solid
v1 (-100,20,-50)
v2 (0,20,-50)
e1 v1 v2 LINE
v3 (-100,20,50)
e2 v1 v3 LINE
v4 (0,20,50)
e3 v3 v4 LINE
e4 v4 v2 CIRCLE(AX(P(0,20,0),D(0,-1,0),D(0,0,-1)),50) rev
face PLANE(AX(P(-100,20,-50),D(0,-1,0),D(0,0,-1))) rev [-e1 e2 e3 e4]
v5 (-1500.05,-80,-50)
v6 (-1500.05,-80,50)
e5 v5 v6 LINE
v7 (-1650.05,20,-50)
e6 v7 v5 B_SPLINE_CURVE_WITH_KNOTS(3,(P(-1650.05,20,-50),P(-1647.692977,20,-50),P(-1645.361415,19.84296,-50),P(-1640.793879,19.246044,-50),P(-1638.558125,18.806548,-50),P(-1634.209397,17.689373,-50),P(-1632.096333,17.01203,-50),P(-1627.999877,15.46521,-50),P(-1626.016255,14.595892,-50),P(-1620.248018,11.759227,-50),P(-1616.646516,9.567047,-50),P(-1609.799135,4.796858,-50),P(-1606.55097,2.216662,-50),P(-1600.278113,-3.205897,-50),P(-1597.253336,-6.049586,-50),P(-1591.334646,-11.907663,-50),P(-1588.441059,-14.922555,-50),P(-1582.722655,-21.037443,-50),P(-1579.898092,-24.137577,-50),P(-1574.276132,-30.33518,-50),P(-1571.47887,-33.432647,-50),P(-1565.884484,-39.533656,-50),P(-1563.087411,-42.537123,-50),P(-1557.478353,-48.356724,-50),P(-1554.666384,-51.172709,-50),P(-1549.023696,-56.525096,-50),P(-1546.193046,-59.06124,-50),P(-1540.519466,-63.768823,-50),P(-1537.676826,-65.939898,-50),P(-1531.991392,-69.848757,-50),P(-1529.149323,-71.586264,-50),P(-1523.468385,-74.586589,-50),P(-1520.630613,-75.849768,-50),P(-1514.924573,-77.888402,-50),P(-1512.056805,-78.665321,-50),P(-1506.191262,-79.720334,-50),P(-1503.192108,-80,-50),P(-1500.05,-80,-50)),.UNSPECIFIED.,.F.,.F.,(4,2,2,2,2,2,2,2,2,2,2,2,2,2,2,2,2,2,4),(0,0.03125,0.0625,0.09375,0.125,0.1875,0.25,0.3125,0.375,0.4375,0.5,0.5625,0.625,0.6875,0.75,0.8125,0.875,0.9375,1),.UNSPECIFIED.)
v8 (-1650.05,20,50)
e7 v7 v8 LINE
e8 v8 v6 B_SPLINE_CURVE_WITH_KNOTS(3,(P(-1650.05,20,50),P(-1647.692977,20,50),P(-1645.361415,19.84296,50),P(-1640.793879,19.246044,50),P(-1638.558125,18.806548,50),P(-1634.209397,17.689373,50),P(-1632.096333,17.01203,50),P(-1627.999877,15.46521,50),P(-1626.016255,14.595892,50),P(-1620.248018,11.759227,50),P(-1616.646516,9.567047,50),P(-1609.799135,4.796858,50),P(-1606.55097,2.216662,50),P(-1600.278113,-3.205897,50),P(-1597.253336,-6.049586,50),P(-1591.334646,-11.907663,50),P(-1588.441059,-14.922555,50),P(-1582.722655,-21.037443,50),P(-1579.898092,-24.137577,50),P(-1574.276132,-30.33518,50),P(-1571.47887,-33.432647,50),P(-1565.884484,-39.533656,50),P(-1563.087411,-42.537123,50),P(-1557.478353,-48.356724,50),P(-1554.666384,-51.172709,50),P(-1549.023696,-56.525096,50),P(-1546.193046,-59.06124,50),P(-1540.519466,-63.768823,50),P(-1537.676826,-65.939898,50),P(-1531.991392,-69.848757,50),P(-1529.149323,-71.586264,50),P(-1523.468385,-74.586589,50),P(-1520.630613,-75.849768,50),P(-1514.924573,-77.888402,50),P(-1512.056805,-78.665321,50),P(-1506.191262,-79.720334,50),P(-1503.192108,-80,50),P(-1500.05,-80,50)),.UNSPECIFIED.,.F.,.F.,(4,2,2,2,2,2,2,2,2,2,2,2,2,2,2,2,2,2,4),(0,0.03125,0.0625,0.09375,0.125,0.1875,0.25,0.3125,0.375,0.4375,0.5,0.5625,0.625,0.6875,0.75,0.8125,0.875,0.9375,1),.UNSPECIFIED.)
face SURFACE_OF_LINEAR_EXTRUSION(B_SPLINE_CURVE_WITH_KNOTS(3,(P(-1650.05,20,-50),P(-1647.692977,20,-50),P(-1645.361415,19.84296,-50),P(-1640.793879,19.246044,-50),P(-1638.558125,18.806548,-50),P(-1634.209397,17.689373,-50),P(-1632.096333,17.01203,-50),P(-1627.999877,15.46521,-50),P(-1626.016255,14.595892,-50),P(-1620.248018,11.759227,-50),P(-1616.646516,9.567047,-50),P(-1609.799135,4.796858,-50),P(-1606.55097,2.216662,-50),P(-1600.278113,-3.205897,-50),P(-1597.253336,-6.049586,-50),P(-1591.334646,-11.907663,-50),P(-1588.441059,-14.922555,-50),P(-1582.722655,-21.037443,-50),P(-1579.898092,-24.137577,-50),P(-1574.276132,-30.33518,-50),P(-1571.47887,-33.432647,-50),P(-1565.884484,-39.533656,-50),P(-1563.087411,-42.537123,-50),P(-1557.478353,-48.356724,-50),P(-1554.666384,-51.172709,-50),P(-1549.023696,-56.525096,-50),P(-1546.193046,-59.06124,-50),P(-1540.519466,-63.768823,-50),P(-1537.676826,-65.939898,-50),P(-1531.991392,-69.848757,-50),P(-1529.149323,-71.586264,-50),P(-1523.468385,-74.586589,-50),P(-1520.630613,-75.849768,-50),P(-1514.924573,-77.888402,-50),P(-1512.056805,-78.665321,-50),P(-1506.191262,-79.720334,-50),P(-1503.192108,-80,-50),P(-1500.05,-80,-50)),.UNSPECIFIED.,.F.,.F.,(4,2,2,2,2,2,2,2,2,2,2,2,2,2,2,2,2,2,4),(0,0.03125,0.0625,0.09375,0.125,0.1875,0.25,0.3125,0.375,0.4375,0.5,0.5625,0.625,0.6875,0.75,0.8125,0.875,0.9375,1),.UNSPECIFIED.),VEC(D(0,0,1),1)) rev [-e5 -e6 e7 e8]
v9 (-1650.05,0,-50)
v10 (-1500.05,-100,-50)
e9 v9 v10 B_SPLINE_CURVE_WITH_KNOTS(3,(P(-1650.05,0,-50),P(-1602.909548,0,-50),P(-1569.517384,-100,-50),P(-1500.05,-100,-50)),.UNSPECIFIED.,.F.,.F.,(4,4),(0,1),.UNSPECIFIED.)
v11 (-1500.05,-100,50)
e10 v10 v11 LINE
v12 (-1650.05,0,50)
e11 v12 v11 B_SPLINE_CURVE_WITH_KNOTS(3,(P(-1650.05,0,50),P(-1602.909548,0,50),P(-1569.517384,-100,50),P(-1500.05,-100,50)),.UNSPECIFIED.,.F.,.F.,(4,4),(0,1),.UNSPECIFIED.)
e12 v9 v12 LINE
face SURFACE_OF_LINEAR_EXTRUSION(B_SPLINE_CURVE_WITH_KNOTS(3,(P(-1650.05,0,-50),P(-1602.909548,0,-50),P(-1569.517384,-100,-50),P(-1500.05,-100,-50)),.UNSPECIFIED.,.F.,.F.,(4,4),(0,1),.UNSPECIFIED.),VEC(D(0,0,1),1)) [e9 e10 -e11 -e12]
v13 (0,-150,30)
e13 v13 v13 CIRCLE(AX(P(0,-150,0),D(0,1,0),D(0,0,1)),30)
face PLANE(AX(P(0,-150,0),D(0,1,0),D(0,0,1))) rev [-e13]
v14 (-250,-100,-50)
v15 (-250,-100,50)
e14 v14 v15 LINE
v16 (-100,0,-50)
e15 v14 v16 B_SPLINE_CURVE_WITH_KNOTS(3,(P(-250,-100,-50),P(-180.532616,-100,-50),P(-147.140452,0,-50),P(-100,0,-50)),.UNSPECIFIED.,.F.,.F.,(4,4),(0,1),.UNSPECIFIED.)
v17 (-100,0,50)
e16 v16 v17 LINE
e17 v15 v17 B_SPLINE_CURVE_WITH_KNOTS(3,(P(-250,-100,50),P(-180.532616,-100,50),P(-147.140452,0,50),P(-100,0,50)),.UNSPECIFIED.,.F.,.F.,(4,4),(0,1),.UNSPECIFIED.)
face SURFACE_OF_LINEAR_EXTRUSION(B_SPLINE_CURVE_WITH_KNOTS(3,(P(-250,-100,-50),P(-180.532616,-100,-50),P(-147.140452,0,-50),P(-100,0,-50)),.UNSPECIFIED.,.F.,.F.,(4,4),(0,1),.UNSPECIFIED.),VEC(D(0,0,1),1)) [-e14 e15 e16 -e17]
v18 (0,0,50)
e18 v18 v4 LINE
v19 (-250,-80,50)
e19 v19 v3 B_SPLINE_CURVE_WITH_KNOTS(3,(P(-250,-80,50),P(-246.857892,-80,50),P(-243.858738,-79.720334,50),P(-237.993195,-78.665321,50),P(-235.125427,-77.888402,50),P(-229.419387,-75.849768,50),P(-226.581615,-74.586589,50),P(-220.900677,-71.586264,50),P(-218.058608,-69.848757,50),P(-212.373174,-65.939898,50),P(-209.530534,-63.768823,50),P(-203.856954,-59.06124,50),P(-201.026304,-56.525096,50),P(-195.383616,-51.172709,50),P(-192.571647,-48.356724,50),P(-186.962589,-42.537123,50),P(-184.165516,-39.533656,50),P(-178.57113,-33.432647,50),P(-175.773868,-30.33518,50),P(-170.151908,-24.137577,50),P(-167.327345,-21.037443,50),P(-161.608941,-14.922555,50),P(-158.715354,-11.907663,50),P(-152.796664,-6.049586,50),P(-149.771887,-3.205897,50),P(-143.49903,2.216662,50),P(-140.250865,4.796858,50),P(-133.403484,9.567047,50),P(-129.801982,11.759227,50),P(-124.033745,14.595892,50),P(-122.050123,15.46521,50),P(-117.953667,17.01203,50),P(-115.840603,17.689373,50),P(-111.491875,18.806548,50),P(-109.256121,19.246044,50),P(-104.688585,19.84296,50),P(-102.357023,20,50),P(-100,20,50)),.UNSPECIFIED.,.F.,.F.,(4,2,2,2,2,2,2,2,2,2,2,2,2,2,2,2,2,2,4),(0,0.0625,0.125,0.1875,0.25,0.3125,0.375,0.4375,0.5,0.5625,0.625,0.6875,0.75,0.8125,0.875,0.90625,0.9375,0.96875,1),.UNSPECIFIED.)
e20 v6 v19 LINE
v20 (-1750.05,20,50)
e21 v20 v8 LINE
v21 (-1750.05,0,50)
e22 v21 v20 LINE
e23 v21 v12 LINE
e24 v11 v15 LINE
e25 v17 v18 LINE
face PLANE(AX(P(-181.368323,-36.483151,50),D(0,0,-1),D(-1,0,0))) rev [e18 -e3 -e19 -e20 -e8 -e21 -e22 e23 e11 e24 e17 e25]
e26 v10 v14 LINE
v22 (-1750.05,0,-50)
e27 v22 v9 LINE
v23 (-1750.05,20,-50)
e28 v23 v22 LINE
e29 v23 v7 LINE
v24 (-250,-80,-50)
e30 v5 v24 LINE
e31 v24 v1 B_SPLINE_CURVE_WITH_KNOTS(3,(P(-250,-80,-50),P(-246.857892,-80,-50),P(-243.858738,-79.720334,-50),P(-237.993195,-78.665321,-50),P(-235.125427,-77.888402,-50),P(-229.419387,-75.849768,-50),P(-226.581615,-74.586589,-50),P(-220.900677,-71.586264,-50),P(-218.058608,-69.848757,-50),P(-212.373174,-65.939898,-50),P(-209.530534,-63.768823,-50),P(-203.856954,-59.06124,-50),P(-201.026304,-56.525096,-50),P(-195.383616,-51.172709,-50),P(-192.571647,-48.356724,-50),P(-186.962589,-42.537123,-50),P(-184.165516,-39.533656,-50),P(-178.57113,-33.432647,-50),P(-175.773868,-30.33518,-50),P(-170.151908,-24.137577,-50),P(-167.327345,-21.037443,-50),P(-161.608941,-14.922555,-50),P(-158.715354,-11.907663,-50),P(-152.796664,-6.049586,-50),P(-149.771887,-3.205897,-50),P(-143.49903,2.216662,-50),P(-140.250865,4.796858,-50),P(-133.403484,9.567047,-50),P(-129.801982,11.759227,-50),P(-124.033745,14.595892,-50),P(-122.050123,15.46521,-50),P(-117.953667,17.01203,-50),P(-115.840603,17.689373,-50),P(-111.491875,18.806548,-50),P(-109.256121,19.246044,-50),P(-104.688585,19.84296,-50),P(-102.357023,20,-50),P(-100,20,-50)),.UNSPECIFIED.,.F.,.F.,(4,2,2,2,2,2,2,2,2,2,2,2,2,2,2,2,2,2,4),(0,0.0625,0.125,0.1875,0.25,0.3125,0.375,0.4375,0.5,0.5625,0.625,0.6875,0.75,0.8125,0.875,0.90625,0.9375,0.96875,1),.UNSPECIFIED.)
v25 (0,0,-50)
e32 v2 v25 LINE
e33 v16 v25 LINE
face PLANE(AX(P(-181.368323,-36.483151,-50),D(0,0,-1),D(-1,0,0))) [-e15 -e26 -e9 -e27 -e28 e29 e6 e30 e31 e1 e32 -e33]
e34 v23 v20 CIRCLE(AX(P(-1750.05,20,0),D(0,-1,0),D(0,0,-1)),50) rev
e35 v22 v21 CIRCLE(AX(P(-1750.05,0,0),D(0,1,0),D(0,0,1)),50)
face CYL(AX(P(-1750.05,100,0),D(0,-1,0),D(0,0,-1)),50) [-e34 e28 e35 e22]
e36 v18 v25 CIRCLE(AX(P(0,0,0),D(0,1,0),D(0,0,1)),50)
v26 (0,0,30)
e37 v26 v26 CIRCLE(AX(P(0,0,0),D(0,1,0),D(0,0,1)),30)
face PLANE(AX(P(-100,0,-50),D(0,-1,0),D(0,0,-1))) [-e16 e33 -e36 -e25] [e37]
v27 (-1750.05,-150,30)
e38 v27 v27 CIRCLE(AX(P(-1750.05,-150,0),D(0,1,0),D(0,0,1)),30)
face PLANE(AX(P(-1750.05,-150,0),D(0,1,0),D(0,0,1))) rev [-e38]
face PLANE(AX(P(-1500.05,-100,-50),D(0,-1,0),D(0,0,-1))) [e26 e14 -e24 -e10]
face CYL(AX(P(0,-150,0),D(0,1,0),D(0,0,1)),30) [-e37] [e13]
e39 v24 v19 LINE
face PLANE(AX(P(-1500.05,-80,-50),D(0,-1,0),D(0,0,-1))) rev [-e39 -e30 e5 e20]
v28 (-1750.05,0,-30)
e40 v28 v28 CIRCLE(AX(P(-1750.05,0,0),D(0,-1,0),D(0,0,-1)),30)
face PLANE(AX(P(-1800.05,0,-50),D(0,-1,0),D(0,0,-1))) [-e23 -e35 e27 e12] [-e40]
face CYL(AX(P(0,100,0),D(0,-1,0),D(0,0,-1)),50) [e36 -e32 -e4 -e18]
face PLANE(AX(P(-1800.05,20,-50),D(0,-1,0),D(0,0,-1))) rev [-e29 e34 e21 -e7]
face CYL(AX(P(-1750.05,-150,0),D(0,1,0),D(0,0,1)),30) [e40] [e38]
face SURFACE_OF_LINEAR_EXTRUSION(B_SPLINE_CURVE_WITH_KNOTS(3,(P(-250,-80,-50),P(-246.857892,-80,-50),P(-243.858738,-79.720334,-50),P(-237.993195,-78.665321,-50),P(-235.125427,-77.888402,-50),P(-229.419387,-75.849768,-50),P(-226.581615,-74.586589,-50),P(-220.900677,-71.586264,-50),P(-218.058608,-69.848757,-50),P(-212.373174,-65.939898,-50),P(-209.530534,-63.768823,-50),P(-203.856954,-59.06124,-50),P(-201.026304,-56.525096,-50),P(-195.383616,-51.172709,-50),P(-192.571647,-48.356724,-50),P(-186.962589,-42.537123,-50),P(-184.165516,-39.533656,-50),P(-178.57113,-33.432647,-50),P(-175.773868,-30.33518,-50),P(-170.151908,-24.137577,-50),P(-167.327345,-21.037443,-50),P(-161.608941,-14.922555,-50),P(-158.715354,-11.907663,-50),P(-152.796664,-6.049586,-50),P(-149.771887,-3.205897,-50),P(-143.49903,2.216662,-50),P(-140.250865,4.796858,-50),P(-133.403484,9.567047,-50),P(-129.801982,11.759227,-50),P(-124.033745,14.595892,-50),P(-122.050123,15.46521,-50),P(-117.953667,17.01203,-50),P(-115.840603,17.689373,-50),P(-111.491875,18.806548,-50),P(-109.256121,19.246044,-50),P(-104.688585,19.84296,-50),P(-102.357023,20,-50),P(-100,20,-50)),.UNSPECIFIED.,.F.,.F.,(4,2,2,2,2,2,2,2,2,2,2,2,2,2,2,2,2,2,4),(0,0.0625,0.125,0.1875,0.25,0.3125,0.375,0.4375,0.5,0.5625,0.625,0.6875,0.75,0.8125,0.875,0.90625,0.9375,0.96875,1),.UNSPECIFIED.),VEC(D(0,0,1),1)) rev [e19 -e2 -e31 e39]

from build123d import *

# Parameters (mm, degrees)
SKETCH1_R             = 30
BOSS_EXTRUDE1_DEPTH   = 150
BOSS_EXTRUDE1_2_DEPTH = 150
EXTRUDE_THIN1_START   = -100
EXTRUDE_THIN1_DEPTH   = 100
SKETCH2_OUTSIDE_W     = 2224.156
SKETCH2_OUTSIDE_H     = 474.106
CUT_EXTRUDE1_DEPTH    = 100


# Read off the part's stored shape, not the designer's step: Extrude-Thin1
with BuildPart() as part:
    # Sketch1 → Boss-Extrude1 (new body)
    with BuildSketch(Plane(origin=(0, 0, 0), x_dir=(1, 0, 0), z_dir=(0, 1, 0))):
        with Locations(Location((0, 0, 0), (0, 0, 270))):
            Circle(SKETCH1_R)
    extrude(amount=-BOSS_EXTRUDE1_DEPTH)



with BuildPart() as body_2:
    # Sketch1 → Boss-Extrude1 2 (new body)
    with BuildSketch(Plane(origin=(0, 0, 0), x_dir=(1, 0, 0), z_dir=(0, 1, 0))):
        with Locations(Location((-1750.05, 0, 0), (0, 0, 270))):
            Circle(SKETCH1_R)
    extrude(amount=-BOSS_EXTRUDE1_2_DEPTH)


with BuildPart() as part_1:
    add(part.part)

    add(body_2.part)  # Extrude-Thin1 merges body 2
    # Extrude-Thin1 outline → Extrude-Thin1 (add)
    with BuildSketch(Plane.XY.offset(50).offset(EXTRUDE_THIN1_START)):
        with BuildLine():
            Line((-1500.05, -100), (-250, -100))
            add(Edge.make_bspline(
                [(-250, -100), (-180.532615563, -100), (-147.140452079, 0), (-100, 0)],
                knots=[0, 0, 0, 0, 1, 1, 1, 1], degree=3))
            Line((-100, 0), (50, 0))
            Line((50, 0), (50, 20))
            Line((50, 20), (-100, 20))
            add(Edge.make_bspline(
                [(-250, -80), (-246.8578922, -80), (-243.858737849, -79.72033393), (-237.993194947, -78.665321149), (-235.125426927, -77.888401959), (-229.419387385, -75.849767547), (-226.581615187, -74.586589055), (-220.900676803, -71.586264248), (-218.058608228, -69.848756808), (-212.373173985, -65.939898134), (-209.530533574, -63.76882272), (-203.856954109, -59.061240354), (-201.026304365, -56.525095932), (-195.383615818, -51.172709385), (-192.571647436, -48.356724406), (-186.962589328, -42.537122759), (-184.165515953, -39.533655599), (-178.571130319, -33.432647215), (-175.773867523, -30.335180457), (-170.151907521, -24.137576717), (-167.327345009, -21.037442901), (-161.608940626, -14.922554595), (-158.715354463, -11.907662629), (-152.79666366, -6.049585507), (-149.771886809, -3.205896979), (-143.499030151, 2.216662309), (-140.250865349, 4.796857765), (-133.403484489, 9.567046655), (-129.801981816, 11.759226892), (-124.033745357, 14.595891945), (-122.050123128, 15.465210164), (-117.953666514, 17.012030347), (-115.8406028, 17.689372637), (-111.491874555, 18.806547682), (-109.256121065, 19.246044187), (-104.688584729, 19.842959809), (-102.357022604, 20), (-100, 20)],
                knots=[0, 0, 0, 0, 0.0625, 0.0625, 0.125, 0.125, 0.1875, 0.1875, 0.25, 0.25, 0.3125, 0.3125, 0.375, 0.375, 0.4375, 0.4375, 0.5, 0.5, 0.5625, 0.5625, 0.625, 0.625, 0.6875, 0.6875, 0.75, 0.75, 0.8125, 0.8125, 0.875, 0.875, 0.90625, 0.90625, 0.9375, 0.9375, 0.96875, 0.96875, 1, 1, 1, 1], degree=3))
            Line((-250, -80), (-1500.05, -80))
            add(Edge.make_bspline(
                [(-1650.05, 20), (-1647.692977396, 20), (-1645.361415271, 19.842959809), (-1640.793878935, 19.246044187), (-1638.558125445, 18.806547682), (-1634.2093972, 17.689372637), (-1632.096333486, 17.012030347), (-1627.999876872, 15.465210164), (-1626.016254643, 14.595891945), (-1620.248018184, 11.759226892), (-1616.646515511, 9.567046655), (-1609.799134651, 4.796857765), (-1606.550969849, 2.216662309), (-1600.278113191, -3.205896979), (-1597.25333634, -6.049585507), (-1591.334645537, -11.907662629), (-1588.441059374, -14.922554595), (-1582.722654991, -21.037442901), (-1579.898092479, -24.137576717), (-1574.276132477, -30.335180457), (-1571.478869681, -33.432647215), (-1565.884484047, -39.533655599), (-1563.087410672, -42.537122759), (-1557.478352564, -48.356724406), (-1554.666384182, -51.172709385), (-1549.023695635, -56.525095932), (-1546.193045891, -59.061240354), (-1540.519466426, -63.76882272), (-1537.676826015, -65.939898134), (-1531.991391772, -69.848756808), (-1529.149323197, -71.586264248), (-1523.468384813, -74.586589055), (-1520.630612615, -75.849767547), (-1514.924573073, -77.888401959), (-1512.056805053, -78.665321149), (-1506.191262151, -79.72033393), (-1503.1921078, -80), (-1500.05, -80)],
                knots=[0, 0, 0, 0, 0.03125, 0.03125, 0.0625, 0.0625, 0.09375, 0.09375, 0.125, 0.125, 0.1875, 0.1875, 0.25, 0.25, 0.3125, 0.3125, 0.375, 0.375, 0.4375, 0.4375, 0.5, 0.5, 0.5625, 0.5625, 0.625, 0.625, 0.6875, 0.6875, 0.75, 0.75, 0.8125, 0.8125, 0.875, 0.875, 0.9375, 0.9375, 1, 1, 1, 1], degree=3))
            Line((-1650.05, 20), (-1800.05, 20))
            Line((-1800.05, 20), (-1800.05, 0))
            Line((-1800.05, 0), (-1650.05, 0))
            add(Edge.make_bspline(
                [(-1650.05, 0), (-1602.909547921, 0), (-1569.517384437, -100), (-1500.05, -100)],
                knots=[0, 0, 0, 0, 1, 1, 1, 1], degree=3))
        make_face()
    extrude(amount=EXTRUDE_THIN1_DEPTH)

    # Sketch2 outside → Cut-Extrude1 (cut)
    with BuildSketch(Plane(origin=(0, 0, 0), x_dir=(1, 0, 0), z_dir=(0, 1, 0))):
        with Locations((-875.025, 0)):
            Rectangle(SKETCH2_OUTSIDE_W, SKETCH2_OUTSIDE_H)
        with BuildLine():
            Line((0, -50), (-1750.05, -50))
            ThreePointArc((-1750.05, -50), (-1800.05, 0), (-1750.05, 50))
            Line((-1750.05, 50), (0, 50))
            ThreePointArc((0, 50), (50, 0), (0, -50))
        make_face(mode=Mode.SUBTRACT)
    extrude(amount=CUT_EXTRUDE1_DEPTH, mode=Mode.SUBTRACT)


solid = part_1.part
